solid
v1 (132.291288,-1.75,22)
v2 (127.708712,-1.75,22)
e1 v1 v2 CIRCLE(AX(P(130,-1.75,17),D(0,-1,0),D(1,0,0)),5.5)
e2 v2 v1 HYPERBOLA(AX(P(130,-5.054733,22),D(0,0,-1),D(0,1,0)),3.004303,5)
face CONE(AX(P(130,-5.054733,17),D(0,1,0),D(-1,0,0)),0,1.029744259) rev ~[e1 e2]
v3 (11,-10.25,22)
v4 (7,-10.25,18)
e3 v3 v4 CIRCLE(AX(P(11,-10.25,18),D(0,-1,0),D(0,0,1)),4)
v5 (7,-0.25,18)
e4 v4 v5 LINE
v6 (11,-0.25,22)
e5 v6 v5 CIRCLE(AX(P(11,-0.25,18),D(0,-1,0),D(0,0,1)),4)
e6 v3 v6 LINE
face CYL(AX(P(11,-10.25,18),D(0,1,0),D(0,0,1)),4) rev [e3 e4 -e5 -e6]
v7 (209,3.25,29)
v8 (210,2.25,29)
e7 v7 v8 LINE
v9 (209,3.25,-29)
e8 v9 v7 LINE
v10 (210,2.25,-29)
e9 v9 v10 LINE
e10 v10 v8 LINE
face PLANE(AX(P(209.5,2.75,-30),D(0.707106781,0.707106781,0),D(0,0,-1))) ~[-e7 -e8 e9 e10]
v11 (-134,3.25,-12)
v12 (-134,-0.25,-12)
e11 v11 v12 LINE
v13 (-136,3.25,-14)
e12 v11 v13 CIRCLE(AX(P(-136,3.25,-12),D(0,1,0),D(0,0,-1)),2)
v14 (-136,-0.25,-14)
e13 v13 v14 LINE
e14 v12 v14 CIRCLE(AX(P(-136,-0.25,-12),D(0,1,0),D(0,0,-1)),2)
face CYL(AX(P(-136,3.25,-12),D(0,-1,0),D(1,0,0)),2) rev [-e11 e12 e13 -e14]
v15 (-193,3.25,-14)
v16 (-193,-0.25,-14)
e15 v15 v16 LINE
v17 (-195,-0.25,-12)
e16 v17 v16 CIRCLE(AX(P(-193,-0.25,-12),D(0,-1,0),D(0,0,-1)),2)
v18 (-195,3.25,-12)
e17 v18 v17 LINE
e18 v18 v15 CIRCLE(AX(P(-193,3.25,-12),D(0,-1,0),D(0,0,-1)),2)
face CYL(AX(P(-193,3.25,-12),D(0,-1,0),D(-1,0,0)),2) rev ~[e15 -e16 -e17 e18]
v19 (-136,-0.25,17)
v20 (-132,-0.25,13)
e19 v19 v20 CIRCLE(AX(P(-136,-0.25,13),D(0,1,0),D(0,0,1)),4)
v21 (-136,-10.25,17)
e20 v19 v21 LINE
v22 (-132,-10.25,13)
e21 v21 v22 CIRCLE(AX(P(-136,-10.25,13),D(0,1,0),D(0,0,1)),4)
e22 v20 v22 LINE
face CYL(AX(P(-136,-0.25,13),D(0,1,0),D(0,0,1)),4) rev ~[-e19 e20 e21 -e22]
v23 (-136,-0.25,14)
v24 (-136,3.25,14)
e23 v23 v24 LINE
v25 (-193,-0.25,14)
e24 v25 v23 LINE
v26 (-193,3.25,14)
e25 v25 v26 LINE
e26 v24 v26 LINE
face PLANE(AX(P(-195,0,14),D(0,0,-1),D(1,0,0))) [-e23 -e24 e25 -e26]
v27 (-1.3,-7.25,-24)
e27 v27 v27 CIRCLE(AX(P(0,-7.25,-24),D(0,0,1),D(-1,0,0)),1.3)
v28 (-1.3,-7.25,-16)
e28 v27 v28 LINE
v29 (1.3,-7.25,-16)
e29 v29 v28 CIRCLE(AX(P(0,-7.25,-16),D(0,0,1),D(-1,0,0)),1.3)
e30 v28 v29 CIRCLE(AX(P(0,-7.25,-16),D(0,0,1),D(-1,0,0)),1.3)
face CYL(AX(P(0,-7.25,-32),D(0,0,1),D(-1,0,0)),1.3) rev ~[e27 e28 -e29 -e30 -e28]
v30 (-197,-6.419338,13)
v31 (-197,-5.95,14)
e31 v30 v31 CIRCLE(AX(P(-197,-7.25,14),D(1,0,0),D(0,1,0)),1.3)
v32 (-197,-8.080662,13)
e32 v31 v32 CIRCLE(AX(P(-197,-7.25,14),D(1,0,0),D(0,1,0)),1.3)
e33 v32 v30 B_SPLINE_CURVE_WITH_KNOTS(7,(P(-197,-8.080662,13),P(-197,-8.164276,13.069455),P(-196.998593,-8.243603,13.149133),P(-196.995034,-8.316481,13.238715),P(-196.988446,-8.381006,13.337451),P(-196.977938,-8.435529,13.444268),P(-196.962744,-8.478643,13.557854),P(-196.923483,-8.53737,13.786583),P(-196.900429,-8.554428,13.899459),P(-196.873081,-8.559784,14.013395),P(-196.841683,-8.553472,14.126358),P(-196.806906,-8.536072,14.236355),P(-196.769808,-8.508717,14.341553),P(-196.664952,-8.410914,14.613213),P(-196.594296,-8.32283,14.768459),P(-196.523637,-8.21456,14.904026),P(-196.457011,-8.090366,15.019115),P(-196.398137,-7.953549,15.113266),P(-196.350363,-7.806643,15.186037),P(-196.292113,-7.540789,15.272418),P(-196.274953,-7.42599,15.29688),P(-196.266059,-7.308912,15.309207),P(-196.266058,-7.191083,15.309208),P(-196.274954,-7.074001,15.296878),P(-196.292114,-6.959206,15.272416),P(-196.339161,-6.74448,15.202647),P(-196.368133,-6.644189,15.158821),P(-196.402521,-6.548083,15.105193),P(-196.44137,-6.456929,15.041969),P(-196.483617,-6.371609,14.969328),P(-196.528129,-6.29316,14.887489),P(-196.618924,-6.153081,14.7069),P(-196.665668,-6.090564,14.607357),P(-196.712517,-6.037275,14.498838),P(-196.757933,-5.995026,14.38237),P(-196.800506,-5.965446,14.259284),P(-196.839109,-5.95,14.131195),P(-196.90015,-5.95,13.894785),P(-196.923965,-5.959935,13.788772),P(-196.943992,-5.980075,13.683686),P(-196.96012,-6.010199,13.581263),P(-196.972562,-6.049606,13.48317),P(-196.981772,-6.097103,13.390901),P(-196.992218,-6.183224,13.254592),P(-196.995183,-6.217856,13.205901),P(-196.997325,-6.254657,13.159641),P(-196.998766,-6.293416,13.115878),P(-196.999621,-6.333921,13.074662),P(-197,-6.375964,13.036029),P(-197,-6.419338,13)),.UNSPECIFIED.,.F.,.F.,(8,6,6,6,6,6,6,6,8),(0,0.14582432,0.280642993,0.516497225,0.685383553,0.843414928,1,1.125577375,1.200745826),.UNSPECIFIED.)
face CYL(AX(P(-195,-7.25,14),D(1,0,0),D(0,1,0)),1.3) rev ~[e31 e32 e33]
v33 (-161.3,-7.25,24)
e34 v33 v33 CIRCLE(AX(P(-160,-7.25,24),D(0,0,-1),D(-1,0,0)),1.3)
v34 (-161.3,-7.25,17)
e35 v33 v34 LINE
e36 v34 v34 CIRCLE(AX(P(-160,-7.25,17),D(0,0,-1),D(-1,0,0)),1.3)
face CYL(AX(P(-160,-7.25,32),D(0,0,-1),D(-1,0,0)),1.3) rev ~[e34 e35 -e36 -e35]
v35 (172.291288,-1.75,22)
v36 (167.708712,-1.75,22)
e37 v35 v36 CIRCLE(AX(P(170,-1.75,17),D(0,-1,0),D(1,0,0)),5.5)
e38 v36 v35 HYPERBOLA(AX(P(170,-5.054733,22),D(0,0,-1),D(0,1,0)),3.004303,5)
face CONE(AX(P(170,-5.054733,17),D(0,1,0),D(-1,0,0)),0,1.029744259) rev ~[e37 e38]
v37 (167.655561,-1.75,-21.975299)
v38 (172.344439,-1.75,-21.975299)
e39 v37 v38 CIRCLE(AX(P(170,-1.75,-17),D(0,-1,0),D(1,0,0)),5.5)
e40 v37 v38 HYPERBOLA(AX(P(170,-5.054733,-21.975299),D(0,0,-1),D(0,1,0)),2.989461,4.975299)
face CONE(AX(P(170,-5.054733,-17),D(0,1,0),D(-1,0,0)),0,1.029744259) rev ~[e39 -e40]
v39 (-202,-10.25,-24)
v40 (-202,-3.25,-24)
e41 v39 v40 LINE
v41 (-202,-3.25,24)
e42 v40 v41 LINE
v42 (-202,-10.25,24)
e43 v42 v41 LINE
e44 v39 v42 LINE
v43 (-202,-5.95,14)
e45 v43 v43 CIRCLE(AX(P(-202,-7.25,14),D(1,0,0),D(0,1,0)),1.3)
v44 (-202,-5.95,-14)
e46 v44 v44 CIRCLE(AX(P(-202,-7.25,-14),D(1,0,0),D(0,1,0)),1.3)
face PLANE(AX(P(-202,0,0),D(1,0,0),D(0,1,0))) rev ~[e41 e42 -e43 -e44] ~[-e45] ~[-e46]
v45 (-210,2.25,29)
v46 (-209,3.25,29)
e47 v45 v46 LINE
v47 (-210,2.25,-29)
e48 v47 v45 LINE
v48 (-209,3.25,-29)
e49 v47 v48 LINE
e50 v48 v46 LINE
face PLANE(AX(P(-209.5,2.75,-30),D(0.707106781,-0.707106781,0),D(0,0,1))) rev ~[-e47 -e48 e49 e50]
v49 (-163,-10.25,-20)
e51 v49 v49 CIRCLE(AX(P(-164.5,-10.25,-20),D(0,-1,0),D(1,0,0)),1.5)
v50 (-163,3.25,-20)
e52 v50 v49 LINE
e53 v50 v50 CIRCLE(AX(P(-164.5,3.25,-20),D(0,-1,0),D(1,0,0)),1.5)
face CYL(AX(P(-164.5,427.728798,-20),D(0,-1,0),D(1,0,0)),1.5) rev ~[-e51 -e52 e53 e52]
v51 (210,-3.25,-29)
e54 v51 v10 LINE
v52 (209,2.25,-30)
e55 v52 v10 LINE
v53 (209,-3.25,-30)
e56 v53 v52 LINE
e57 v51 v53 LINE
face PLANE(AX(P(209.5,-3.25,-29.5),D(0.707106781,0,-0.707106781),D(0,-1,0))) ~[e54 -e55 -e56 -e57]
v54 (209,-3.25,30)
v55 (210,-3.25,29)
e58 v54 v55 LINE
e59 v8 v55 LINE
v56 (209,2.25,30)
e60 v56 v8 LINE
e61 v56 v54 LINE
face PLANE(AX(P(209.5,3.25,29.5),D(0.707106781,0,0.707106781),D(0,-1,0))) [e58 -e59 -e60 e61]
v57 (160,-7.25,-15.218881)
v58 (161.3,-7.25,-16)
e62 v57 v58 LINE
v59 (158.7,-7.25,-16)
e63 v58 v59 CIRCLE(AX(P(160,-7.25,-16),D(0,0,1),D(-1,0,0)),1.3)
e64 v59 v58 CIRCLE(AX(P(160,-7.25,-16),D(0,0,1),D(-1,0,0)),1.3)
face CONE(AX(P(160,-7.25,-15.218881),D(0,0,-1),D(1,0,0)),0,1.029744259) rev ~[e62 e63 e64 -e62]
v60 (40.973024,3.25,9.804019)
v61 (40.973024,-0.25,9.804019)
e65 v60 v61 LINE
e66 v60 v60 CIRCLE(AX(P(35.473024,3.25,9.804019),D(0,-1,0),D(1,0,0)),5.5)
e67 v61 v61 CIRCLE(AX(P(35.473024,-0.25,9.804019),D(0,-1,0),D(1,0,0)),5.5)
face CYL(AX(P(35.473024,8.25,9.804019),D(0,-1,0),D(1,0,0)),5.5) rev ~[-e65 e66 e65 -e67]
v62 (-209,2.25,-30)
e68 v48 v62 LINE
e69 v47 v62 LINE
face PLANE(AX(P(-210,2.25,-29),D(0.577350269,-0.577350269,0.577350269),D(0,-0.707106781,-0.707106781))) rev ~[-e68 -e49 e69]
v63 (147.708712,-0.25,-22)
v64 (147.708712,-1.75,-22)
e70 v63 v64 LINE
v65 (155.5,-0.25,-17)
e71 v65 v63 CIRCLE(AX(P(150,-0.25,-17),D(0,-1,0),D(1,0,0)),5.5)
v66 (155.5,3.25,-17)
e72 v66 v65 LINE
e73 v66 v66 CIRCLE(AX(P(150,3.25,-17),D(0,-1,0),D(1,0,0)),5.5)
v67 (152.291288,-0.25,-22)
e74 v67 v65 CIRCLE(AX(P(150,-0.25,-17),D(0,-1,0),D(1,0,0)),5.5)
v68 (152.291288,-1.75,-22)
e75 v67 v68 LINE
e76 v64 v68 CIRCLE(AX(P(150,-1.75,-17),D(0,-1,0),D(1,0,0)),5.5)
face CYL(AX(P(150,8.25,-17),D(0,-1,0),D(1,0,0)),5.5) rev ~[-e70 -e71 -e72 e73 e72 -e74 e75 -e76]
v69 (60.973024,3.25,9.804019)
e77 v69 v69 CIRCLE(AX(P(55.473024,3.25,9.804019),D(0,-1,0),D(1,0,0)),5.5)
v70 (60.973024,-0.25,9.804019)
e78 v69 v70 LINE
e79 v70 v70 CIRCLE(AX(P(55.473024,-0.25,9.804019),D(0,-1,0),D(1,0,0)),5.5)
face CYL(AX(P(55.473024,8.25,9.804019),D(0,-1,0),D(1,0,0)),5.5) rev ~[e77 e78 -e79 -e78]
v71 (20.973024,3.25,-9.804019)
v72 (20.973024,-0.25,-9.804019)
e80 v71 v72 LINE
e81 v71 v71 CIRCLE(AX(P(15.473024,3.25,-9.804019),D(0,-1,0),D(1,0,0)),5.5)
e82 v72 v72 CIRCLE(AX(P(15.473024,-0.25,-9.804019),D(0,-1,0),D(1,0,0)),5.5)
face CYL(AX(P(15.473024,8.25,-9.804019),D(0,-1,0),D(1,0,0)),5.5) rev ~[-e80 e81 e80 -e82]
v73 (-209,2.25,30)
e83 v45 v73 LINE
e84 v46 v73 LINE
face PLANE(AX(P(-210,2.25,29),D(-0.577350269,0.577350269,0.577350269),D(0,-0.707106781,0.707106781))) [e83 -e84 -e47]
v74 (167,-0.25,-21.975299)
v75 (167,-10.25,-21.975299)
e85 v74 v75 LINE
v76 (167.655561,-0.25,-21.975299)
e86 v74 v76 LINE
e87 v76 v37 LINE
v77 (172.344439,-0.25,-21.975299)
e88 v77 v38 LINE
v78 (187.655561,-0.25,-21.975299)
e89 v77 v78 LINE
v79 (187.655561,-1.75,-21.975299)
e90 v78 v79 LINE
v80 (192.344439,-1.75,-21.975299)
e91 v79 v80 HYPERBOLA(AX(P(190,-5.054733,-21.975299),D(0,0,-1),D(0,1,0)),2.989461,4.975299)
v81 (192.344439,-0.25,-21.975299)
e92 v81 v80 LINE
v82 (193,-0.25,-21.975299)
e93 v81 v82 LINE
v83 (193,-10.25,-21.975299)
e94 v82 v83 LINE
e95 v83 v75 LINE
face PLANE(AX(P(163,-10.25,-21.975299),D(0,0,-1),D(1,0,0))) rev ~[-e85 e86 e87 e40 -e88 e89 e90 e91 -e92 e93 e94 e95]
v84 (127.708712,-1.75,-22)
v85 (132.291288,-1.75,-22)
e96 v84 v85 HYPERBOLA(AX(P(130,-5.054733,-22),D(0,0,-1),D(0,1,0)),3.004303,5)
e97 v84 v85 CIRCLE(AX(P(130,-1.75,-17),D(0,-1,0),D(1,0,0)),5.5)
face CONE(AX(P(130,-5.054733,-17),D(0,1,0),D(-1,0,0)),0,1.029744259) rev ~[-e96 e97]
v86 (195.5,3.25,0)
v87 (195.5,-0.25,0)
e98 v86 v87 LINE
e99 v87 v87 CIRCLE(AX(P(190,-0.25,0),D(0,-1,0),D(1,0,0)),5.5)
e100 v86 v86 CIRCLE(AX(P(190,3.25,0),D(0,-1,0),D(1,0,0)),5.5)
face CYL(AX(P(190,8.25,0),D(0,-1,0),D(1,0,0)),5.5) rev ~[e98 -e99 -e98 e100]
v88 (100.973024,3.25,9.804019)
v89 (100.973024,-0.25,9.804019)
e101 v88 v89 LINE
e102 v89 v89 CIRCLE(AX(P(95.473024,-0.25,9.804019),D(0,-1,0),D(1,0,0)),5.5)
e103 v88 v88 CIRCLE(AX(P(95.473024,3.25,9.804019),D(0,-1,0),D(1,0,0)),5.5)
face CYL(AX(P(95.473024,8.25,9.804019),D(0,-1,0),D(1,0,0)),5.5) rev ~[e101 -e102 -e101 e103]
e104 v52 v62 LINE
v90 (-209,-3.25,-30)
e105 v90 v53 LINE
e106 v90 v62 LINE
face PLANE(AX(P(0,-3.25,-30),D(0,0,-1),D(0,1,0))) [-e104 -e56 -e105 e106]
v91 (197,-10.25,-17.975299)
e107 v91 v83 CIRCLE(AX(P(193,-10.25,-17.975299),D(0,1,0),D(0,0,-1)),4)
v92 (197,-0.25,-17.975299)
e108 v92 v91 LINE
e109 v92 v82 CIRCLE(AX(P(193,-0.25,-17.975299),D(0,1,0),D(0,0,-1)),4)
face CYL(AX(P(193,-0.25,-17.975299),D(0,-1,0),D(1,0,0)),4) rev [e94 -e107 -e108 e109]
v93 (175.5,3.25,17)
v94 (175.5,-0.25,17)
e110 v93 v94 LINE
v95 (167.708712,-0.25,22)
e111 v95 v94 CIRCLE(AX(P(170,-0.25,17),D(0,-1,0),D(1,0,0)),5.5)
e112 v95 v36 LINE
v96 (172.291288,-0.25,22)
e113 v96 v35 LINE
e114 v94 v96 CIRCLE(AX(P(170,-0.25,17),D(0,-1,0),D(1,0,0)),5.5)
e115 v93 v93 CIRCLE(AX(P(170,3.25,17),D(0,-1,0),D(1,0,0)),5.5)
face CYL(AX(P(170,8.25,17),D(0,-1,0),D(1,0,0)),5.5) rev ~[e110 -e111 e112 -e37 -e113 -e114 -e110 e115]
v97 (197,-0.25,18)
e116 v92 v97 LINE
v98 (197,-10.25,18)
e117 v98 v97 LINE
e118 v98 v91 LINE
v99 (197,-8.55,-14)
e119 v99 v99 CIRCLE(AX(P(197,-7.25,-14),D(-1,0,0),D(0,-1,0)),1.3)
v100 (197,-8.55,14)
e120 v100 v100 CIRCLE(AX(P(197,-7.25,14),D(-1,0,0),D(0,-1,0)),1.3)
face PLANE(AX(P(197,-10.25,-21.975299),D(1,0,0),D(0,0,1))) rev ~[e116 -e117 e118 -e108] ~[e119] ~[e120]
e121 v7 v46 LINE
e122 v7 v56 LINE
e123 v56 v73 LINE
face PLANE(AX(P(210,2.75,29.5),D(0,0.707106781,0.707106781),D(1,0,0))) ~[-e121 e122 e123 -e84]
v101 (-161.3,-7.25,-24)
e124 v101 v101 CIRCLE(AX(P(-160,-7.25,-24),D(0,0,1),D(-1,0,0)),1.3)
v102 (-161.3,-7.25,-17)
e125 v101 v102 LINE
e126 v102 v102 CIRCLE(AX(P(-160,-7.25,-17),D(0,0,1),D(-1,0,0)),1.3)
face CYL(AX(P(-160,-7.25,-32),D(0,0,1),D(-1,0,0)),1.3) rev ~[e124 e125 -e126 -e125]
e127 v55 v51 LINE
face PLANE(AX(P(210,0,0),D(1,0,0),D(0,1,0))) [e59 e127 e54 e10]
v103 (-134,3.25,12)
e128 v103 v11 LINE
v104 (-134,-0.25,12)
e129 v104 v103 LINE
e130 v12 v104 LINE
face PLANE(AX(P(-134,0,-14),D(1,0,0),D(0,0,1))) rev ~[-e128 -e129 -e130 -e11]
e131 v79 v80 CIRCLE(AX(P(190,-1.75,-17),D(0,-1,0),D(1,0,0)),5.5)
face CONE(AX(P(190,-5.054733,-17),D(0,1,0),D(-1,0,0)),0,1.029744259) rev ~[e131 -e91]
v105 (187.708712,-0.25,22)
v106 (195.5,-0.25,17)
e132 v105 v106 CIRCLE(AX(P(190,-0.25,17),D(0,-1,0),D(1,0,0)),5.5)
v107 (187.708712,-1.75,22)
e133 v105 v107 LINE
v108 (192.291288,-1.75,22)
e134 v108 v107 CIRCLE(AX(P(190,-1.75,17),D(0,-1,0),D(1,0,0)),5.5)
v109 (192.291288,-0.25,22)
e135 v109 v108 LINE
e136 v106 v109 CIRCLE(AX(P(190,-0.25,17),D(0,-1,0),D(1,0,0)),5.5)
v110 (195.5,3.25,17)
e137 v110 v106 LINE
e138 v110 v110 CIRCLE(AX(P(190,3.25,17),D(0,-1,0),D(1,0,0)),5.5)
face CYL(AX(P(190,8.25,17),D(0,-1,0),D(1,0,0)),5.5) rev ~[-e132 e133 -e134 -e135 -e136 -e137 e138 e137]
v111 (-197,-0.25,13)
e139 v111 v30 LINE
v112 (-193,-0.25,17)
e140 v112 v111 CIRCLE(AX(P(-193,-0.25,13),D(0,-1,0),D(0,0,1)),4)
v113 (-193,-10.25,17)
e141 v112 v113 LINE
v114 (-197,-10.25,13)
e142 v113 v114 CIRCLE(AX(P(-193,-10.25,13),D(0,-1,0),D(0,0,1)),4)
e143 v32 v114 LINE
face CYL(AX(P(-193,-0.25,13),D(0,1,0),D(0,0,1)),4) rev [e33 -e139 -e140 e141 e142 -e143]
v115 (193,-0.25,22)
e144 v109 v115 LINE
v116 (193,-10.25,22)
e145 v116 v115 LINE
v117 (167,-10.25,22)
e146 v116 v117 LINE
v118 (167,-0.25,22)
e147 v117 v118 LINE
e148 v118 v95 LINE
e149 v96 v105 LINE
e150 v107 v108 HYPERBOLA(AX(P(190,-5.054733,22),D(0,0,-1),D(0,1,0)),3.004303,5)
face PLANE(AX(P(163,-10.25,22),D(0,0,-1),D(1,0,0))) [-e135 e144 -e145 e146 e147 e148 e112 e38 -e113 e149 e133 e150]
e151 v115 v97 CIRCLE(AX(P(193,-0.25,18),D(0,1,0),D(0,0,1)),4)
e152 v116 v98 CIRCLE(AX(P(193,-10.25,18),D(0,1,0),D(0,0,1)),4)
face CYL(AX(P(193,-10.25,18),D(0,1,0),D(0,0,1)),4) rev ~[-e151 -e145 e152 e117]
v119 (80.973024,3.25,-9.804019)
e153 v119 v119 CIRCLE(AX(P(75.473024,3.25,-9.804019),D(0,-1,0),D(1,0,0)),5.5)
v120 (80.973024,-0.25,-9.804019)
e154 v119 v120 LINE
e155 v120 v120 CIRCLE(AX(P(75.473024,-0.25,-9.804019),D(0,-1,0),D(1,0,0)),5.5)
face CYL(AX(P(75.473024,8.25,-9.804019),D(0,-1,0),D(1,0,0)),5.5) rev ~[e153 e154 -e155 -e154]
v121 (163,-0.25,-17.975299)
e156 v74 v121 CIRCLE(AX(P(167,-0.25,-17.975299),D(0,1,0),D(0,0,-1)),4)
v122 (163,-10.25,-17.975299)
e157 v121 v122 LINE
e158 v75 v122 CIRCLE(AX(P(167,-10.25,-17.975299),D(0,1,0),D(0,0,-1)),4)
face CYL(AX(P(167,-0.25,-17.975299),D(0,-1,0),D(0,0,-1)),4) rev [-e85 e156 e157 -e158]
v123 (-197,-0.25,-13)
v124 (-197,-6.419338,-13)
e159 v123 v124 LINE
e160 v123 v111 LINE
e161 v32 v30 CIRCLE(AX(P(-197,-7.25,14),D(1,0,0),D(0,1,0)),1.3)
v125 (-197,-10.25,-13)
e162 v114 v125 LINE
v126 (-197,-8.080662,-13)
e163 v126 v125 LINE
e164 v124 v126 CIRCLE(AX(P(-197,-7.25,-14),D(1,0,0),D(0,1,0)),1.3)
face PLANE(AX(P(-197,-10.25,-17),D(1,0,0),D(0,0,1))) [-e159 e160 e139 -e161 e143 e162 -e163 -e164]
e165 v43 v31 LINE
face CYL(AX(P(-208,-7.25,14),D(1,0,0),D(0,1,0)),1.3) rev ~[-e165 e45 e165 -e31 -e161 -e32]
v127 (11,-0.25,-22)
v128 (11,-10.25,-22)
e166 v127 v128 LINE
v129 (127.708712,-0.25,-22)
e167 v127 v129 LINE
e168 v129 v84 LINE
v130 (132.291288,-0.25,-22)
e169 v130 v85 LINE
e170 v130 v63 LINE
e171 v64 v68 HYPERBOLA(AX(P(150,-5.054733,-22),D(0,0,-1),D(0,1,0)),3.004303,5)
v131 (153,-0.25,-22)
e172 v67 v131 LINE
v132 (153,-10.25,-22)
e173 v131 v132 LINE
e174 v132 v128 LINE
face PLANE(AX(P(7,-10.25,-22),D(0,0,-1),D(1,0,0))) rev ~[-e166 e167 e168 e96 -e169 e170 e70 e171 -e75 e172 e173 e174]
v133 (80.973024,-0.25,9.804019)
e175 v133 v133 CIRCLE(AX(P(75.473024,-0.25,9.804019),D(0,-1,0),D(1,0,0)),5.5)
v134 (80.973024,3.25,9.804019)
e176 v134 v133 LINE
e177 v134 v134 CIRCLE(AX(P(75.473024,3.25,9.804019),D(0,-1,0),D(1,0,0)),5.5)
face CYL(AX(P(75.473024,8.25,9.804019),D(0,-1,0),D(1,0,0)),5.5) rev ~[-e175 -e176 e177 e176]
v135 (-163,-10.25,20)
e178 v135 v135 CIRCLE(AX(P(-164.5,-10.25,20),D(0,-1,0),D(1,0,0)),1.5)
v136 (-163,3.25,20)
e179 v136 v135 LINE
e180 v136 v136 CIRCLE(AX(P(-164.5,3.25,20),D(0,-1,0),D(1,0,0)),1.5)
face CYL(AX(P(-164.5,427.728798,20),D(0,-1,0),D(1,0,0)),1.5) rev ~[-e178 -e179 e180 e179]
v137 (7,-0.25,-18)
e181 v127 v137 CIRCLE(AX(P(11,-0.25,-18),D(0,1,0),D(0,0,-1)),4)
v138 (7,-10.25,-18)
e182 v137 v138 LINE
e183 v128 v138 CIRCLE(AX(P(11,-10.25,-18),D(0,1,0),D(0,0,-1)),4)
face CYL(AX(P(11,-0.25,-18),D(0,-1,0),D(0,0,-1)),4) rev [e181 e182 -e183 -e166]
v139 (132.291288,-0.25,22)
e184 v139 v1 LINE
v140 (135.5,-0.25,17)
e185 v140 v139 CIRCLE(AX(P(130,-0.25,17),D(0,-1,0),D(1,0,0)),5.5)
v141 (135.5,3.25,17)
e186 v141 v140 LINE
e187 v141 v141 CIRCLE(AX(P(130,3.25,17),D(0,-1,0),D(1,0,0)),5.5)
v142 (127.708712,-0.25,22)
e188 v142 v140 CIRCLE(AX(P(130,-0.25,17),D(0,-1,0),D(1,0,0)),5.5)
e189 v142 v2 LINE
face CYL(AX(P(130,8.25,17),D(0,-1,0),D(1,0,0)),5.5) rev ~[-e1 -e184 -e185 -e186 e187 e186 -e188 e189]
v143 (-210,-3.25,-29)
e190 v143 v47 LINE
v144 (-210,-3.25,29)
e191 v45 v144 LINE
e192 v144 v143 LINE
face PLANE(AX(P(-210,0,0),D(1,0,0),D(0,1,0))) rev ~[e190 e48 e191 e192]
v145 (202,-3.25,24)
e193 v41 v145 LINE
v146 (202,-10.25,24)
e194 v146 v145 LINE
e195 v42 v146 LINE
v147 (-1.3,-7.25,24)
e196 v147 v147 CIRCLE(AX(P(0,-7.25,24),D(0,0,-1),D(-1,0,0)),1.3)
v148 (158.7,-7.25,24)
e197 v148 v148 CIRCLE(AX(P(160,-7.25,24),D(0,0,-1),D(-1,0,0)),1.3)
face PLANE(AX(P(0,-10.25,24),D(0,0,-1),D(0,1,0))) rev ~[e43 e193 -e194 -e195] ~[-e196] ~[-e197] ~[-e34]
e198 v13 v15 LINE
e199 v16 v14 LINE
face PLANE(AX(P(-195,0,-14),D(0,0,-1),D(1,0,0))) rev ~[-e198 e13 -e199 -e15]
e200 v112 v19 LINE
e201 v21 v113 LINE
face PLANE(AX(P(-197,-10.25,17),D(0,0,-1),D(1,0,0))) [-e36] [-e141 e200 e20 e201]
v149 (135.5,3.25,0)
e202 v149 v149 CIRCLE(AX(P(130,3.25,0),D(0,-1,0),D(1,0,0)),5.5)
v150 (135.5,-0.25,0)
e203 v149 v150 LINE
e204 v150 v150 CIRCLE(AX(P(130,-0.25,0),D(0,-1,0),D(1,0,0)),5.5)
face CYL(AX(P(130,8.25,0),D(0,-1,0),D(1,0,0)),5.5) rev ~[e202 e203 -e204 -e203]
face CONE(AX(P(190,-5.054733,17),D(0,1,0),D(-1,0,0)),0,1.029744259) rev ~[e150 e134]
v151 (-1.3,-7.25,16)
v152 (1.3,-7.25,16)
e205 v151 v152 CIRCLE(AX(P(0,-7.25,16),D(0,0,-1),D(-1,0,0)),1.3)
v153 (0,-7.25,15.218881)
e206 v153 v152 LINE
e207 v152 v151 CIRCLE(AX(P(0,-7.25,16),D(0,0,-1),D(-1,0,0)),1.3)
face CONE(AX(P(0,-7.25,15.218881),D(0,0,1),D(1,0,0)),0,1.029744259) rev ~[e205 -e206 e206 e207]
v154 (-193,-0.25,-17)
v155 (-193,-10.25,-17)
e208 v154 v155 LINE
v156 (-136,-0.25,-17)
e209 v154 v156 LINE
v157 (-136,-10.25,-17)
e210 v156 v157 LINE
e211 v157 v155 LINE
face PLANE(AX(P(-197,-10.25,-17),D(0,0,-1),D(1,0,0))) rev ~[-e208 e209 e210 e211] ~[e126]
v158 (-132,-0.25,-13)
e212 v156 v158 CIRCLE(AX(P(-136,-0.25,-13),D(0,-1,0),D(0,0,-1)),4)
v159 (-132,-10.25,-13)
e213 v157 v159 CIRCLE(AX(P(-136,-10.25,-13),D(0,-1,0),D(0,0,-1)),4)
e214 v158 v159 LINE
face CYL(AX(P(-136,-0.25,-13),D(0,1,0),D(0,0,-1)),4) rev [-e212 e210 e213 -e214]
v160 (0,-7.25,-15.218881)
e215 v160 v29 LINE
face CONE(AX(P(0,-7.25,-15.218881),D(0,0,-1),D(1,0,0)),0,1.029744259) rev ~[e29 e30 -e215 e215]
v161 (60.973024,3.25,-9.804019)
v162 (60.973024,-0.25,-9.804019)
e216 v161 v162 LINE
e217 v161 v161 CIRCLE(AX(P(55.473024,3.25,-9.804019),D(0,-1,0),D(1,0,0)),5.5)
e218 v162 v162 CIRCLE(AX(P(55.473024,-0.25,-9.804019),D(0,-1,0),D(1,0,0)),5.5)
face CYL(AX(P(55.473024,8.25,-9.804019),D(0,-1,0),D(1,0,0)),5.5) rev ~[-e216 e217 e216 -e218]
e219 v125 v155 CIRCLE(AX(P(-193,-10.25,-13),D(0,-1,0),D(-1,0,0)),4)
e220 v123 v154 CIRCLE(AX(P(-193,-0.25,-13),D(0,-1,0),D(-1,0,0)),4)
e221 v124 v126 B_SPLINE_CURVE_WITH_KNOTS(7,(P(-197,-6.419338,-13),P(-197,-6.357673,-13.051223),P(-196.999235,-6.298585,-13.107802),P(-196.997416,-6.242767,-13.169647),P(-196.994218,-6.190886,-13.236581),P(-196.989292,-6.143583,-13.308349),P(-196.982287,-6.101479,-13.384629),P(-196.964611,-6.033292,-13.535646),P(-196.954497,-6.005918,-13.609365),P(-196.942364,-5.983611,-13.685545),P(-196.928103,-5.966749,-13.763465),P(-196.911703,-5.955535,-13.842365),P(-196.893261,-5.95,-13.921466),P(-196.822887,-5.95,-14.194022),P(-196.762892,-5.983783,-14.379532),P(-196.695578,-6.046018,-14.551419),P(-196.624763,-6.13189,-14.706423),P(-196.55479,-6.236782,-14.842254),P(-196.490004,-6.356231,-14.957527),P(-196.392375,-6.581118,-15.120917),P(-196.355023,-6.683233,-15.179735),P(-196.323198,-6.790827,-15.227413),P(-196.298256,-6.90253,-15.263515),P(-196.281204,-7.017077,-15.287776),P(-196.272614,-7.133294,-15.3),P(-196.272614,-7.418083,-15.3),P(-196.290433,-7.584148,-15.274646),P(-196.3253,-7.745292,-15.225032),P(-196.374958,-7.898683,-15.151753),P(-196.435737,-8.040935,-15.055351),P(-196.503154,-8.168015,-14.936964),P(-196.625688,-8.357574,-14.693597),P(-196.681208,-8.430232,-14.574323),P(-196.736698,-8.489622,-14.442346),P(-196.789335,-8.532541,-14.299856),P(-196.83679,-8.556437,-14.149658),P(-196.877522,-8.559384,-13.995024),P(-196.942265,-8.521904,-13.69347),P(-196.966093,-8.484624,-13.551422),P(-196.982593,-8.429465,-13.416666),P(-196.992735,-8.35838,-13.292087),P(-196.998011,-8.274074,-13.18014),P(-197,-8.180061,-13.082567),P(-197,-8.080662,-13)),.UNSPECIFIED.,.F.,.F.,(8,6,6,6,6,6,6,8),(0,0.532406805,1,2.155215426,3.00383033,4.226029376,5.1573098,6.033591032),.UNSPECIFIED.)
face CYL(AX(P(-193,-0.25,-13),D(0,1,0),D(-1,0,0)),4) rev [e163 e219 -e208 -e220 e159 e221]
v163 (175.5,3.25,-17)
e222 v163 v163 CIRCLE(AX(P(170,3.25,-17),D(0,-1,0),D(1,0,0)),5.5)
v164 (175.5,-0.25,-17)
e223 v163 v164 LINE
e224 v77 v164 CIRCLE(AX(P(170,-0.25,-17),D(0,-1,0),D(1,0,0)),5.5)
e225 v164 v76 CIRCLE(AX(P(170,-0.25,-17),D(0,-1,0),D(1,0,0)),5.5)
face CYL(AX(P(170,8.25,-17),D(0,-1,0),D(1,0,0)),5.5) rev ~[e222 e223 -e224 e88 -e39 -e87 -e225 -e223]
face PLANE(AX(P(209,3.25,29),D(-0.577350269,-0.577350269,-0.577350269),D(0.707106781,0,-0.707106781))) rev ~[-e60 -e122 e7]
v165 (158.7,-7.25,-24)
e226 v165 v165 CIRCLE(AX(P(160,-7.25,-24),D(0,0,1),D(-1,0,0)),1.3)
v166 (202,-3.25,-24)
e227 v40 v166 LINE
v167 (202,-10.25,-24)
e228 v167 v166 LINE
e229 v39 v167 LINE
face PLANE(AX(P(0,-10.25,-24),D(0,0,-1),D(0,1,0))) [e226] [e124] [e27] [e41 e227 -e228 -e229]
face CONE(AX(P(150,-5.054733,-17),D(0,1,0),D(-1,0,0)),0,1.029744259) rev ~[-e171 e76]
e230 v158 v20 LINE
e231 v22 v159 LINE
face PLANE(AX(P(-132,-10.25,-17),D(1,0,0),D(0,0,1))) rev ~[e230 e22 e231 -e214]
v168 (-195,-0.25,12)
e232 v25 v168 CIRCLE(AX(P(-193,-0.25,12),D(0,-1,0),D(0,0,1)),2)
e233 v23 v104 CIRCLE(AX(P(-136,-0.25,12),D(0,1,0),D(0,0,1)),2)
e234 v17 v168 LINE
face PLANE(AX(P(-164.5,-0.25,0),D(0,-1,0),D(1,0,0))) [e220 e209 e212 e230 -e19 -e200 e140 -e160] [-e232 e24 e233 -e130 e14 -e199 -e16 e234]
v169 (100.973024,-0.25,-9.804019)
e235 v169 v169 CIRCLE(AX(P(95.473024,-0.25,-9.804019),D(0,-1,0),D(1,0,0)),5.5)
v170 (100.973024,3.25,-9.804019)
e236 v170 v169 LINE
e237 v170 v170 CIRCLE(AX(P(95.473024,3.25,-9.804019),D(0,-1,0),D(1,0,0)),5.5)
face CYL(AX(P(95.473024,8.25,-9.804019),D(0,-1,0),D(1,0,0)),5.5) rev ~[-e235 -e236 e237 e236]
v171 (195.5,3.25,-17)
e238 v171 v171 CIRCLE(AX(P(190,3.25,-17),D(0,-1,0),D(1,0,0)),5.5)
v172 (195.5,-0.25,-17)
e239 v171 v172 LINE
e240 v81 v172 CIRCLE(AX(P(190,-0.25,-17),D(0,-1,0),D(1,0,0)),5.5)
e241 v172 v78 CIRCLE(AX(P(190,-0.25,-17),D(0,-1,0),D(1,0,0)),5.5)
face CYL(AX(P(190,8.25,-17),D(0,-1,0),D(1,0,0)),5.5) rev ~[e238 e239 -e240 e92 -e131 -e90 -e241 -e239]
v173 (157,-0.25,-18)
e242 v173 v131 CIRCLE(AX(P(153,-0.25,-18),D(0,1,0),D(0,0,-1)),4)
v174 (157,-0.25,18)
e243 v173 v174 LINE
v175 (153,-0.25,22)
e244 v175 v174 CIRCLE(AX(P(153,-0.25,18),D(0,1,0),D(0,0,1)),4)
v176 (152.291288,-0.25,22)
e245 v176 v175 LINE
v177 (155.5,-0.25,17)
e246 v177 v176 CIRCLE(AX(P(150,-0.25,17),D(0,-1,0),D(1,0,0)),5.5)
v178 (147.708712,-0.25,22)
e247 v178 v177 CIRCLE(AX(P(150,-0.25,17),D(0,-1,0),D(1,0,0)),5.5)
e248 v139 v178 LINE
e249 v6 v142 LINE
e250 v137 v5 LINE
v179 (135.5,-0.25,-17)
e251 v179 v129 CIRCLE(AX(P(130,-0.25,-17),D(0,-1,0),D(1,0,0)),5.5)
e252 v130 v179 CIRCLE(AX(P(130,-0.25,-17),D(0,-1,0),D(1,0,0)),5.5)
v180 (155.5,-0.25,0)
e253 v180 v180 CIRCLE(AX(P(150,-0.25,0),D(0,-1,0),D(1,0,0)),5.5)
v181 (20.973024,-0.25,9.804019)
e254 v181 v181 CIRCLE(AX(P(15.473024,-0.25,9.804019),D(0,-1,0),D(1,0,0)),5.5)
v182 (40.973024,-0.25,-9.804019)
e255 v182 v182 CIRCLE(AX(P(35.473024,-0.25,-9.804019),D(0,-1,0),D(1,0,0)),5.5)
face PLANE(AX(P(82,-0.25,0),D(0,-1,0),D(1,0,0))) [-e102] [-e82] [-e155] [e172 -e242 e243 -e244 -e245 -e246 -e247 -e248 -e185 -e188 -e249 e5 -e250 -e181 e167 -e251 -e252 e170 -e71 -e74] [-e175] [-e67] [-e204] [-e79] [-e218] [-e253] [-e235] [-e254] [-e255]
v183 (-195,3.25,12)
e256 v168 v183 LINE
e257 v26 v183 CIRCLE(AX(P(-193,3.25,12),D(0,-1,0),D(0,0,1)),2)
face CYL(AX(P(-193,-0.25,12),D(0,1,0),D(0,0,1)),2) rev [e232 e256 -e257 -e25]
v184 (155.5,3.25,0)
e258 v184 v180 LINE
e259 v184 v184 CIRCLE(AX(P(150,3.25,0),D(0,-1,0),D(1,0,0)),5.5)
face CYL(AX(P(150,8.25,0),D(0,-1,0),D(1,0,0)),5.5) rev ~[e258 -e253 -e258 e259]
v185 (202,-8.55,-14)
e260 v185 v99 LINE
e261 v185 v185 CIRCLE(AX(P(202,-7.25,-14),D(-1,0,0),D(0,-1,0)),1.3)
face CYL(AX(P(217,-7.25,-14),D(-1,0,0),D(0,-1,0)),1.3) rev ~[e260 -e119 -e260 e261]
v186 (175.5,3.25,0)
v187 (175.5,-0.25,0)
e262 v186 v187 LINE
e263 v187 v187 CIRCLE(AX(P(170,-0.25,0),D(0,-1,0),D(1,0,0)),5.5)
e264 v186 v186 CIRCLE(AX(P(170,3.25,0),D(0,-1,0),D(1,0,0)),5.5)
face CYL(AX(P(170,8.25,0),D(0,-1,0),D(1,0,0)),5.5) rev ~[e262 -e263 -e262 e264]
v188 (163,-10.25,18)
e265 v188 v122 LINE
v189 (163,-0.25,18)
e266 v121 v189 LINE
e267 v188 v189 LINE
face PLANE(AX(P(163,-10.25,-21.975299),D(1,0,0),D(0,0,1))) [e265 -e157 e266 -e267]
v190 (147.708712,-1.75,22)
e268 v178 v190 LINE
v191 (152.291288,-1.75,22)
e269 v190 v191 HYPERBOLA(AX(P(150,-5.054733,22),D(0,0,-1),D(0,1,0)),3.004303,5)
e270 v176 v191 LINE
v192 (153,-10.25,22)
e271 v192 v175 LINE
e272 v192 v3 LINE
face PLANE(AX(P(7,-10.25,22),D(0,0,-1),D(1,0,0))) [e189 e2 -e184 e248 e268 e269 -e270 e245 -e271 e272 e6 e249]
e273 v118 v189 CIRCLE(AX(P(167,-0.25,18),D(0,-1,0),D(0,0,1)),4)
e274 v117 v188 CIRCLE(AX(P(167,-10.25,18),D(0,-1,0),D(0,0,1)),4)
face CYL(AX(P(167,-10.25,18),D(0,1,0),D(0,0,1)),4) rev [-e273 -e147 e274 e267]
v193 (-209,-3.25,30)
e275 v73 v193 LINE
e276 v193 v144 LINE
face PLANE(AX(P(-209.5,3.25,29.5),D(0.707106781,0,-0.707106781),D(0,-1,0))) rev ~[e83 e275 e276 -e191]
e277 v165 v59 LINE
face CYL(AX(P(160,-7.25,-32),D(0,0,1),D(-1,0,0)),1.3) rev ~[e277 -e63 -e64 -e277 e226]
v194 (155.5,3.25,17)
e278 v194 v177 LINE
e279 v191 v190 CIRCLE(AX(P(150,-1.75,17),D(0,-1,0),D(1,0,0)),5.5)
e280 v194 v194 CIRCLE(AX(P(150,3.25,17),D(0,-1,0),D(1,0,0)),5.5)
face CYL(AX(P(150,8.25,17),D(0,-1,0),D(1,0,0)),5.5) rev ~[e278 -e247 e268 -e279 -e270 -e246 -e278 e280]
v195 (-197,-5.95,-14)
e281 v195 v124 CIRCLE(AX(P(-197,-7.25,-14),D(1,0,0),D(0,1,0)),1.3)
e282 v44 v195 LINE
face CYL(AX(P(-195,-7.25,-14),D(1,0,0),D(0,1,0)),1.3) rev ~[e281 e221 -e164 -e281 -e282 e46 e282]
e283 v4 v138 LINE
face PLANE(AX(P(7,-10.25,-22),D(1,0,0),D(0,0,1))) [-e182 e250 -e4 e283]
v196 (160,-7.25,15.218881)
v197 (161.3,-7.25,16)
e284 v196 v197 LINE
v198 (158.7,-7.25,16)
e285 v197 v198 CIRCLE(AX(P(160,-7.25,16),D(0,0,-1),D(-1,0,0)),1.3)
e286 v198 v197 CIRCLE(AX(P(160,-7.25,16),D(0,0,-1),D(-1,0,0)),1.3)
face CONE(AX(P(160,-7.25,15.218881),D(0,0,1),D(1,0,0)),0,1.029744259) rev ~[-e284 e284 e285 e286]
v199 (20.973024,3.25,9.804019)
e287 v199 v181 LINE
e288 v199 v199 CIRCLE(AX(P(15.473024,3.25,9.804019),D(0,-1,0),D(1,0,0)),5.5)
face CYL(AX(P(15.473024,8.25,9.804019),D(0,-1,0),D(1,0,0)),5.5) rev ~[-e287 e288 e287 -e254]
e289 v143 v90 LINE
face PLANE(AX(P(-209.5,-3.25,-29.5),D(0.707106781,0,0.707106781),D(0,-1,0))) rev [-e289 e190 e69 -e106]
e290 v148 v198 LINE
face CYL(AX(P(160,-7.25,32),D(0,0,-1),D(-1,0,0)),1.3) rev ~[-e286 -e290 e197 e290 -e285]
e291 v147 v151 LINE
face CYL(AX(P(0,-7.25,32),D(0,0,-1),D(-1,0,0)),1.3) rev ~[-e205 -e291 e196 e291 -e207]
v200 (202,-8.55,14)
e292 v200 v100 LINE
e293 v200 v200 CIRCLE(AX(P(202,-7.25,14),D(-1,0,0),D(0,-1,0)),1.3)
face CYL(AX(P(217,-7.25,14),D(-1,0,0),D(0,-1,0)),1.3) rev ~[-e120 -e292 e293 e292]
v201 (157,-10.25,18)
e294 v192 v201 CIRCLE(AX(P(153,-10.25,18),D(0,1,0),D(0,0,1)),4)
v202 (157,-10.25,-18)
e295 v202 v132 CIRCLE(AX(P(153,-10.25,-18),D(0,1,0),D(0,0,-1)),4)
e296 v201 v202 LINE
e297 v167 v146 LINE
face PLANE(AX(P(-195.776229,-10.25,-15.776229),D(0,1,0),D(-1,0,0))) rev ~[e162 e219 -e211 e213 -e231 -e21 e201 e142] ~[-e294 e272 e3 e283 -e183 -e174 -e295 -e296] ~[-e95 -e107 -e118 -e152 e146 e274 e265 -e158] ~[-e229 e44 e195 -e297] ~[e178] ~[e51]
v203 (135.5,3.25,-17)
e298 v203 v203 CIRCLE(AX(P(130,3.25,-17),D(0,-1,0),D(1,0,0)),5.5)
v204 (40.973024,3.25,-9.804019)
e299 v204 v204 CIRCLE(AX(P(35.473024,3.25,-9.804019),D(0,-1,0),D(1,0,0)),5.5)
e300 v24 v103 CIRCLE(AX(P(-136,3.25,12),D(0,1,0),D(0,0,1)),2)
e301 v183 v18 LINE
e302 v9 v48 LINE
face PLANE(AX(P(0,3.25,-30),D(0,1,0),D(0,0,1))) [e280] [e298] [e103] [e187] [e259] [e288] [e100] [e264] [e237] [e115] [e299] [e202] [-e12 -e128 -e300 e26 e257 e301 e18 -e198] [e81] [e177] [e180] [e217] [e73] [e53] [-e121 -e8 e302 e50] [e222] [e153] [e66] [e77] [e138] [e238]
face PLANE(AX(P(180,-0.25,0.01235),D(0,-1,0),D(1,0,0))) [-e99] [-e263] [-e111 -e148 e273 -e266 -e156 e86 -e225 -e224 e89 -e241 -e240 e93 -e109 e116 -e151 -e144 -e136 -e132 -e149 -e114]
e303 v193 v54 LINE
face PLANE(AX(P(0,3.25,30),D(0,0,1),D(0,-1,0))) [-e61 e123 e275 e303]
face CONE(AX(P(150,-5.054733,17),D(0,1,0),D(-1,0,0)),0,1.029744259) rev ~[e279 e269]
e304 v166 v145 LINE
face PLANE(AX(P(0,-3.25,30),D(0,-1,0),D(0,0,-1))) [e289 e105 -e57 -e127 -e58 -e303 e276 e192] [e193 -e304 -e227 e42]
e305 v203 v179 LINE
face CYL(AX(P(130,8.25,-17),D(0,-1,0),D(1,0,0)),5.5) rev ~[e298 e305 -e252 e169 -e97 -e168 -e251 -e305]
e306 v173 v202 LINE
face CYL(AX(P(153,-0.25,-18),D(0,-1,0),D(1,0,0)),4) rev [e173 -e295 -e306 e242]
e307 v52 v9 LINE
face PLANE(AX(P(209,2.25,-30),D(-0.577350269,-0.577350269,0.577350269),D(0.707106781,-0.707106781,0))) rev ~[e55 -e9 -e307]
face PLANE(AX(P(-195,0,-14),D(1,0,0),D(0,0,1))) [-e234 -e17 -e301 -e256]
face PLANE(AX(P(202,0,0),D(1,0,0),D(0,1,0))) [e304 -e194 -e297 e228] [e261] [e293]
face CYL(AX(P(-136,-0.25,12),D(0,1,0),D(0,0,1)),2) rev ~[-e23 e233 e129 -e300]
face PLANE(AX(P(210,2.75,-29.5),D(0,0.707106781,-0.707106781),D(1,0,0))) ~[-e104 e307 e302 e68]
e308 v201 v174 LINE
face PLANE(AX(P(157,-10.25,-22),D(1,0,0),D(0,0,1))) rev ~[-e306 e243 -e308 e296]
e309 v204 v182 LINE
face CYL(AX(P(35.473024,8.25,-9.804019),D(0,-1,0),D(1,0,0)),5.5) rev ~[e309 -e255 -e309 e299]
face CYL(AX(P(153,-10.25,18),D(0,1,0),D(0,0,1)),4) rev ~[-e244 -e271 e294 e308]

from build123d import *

# Parameters (mm, degrees)
F1_DEPTH      = 210
F0_W          = 7
F0_H          = 48
F2_DEPTH      = 202
F5_D          = 2.6
F5_DEPTH      = 8
F5_TIP        = 0.7811188047
F6_D          = 2.6
F6_DEPTH      = 8
F6_TIP        = 0.7811188047
F9_D          = 2.6
F9_DEPTH      = 6
F9_TIP        = 0.7811188047
F10_D         = 2.6
F10_DEPTH     = 15
F10_TIP       = 0.7811188047
F11_W         = 61
F11_H         = 28
F12_DEPTH     = 12.5
F15_D         = 3
F17_D         = 11
F17_DEPTH     = 5
F17_TIP       = 3.3047334047
F18_D         = 11
F18_DEPTH     = 5
F18_TIP       = 3.3047334047
F19_SIZE      = 1
F20_W         = 65
F20_H         = 34
F20_W_2       = 61
F20_H_2       = 28
F21_DEPTH     = 10
F22_R         = 2
F23_T1_DEPTH  = 10
F23_T6_DEPTH  = 10
F23_S7_R      = 1.3
F23_T8_DEPTH  = 7
F23_T12_DEPTH = 10
F23_S13_R     = 1.3
F23_T14_DEPTH = 7
F20_W_3       = 150
F20_H_3       = 44
F24_DEPTH     = 10
F25_R         = 4
F20_W_4       = 34
F20_H_4       = 43.9752993435
F26_DEPTH     = 10
F27_R         = 4


# Not quite as in the source:
# - a fillet or chamfer that OpenCascade refuses, or shapes differently, is made with other operations: its cross-section is extruded or revolved along the edge and cut away or added
# - a feature names something its author has since deleted; it is built from what else it names


with BuildPart() as f1:
    # F0 (on Right) → F1 (new body, symmetric)
    with BuildSketch(Plane.YZ):
        Polygon((3.25, 30), (-3.25, 30), (-3.25, 24), (-3.25, -24), (-3.25, -30), (3.25, -30), align=None)
    extrude(amount=F1_DEPTH, both=True)

    # F0 (on Right) → F2 (join, symmetric)
    with BuildSketch(Plane.YZ):
        Polygon((3.25, 30), (-3.25, 30), (-3.25, 24), (-3.25, -24), (-3.25, -30), (3.25, -30), align=None)
        with Locations((-6.75, 0)):
            Rectangle(F0_W, F0_H)
    extrude(amount=F2_DEPTH, both=True)

    # F5
    with Locations(Plane.XY.offset(24)):
        with Locations((0, -7.25), (-160, -7.25), (160, -7.25)):
            Hole(F5_D / 2, depth=F5_DEPTH)
            with Locations((0, 0, -(F5_DEPTH + F5_TIP / 2))):  # 118° drill point
                Cone(0, F5_D / 2, F5_TIP, mode=Mode.SUBTRACT)

    # F6
    with Locations(Plane(origin=(0, 0, -24), x_dir=(1, 0, 0), z_dir=(0, 0, -1))):
        with Locations((-160, 7.25), (0, 7.25), (160, 7.25)):
            Hole(F6_D / 2, depth=F6_DEPTH)
            with Locations((0, 0, -(F6_DEPTH + F6_TIP / 2))):  # 118° drill point
                Cone(0, F6_D / 2, F6_TIP, mode=Mode.SUBTRACT)

    # F9
    with Locations(Plane(origin=(-202, 0, 0), x_dir=(0, -1, 0), z_dir=(-1, 0, 0))):
        with Locations((7.25, -14), (7.25, 14)):
            Hole(F9_D / 2, depth=F9_DEPTH)
            with Locations((0, 0, -(F9_DEPTH + F9_TIP / 2))):  # 118° drill point
                Cone(0, F9_D / 2, F9_TIP, mode=Mode.SUBTRACT)

    # F10
    with Locations(Plane.YZ.offset(202)):
        with Locations((-7.25, -14), (-7.25, 14)):
            Hole(F10_D / 2, depth=F10_DEPTH)
            with Locations((0, 0, -(F10_DEPTH + F10_TIP / 2))):  # 118° drill point
                Cone(0, F10_D / 2, F10_TIP, mode=Mode.SUBTRACT)


with BuildPart() as f12:
    # F11 (on Front) → F12 (new body, symmetric)
    with BuildSketch(Plane.XZ):
        with Locations((-164.5, 0)):
            Rectangle(F11_W, F11_H)
    extrude(amount=F12_DEPTH, both=True)


with BuildPart() as f1_1:
    add(f1.part)

    # F13: cut F12
    add(f12.part, mode=Mode.SUBTRACT)

    # F15 (through all)
    with Locations(Plane(origin=(0, 3.25, 0), x_dir=(-1, 0, 0), z_dir=(0, 1, 0))):
        with Locations((164.5, 20), (164.5, -20)):
            Hole(F15_D / 2)

    # F17
    with Locations(Plane(origin=(0, 3.25, 0), x_dir=(-1, 0, 0), z_dir=(0, 1, 0))):
        with Locations((-190, 17), (-170, 17), (-170, 0), (-190, 0), (-75.4730241728, 9.8040188106), (-55.4730241728, 9.8040188106), (-75.4730241728, -9.8040188106), (-55.4730241728, -9.8040188106), (-170, -17), (-190, -17), (-35.4730241728, 9.8040188106), (-15.4730241728, 9.8040188106), (-15.4730241728, -9.8040188106), (-35.4730241728, -9.8040188106), (-150, 17), (-130, 17), (-130, 0), (-150, 0), (-150, -17), (-130, -17)):
            Hole(F17_D / 2, depth=F17_DEPTH)
            with Locations((0, 0, -(F17_DEPTH + F17_TIP / 2))):  # 118° drill point
                Cone(0, F17_D / 2, F17_TIP, mode=Mode.SUBTRACT)

    # F18
    with Locations(Plane(origin=(0, 3.25, 0), x_dir=(-1, 0, 0), z_dir=(0, 1, 0))):
        with Locations((-95.4730241728, -9.8040188106), (-95.4730241728, 9.8040188106)):
            Hole(F18_D / 2, depth=F18_DEPTH)
            with Locations((0, 0, -(F18_DEPTH + F18_TIP / 2))):  # 118° drill point
                Cone(0, F18_D / 2, F18_TIP, mode=Mode.SUBTRACT)

    # F19
    f19_edges = [f1_1.edges().sort_by_distance(p)[0] for p in [
        (210, 0, 30),
        (0, 3.25, 30),
        (210, 3.25, 0),
        (0, 3.25, -30),
        (-210, 3.25, 0),
        (-210, 0, 30),
        (-210, 0, -30),
        (210, 0, -30),
    ]]
    chamfer(f19_edges, length=F19_SIZE)

    # F20 (on face) → F21 (cut, symmetric)
    with BuildSketch(Plane.XZ.offset(10.25)):
        with Locations((-164.5, 0)):
            Rectangle(F20_W, F20_H)
        with Locations((-164.5, 0)):
            Rectangle(F20_W_2, F20_H_2, mode=Mode.SUBTRACT)
    extrude(amount=F21_DEPTH, both=True, mode=Mode.SUBTRACT)

    # F22
    f22_edges = [f1_1.edges().sort_by_distance(p)[0] for p in [
        (-195, 1.5, 14),
        (-134, 1.5, 14),
        (-195, 1.5, -14),
        (-134, 1.5, -14),
    ]]
    fillet(f22_edges, radius=F22_R)

    # F23: fillet of radius 4 on 4 edges, made by hand

    # F23_s2 → F23_t1 (join)
    with BuildSketch(Plane.XZ.offset(0.25)):
        with BuildLine():
            ThreePointArc((-136, 17), (-133.1715728753, 15.8284271247), (-132, 13))
            Line((-132, 13), (-132, 17))
            Line((-132, 17), (-136, 17))
        make_face()
        with BuildLine():
            ThreePointArc((-136, -17), (-133.1715728753, -15.8284271247), (-132, -13))
            Line((-132, -13), (-132, -17))
            Line((-132, -17), (-136, -17))
        make_face()
    extrude(amount=F23_T1_DEPTH)


with BuildPart() as f23_tool4:
    # F23_s5 → F23_t6 (new body)
    with BuildSketch(Plane.XZ.offset(0.25)):
        with BuildLine():
            ThreePointArc((-193, 17), (-195.8284271247, 15.8284271247), (-197, 13))
            Line((-197, 13), (-197, 17))
            Line((-197, 17), (-193, 17))
        make_face()
    extrude(amount=F23_T6_DEPTH)

    # F23_s7 → F23_t8 (cut, symmetric)
    with BuildSketch(Plane.YZ.offset(-195)):
        with Locations((-7.25, 14)):
            Circle(F23_S7_R)
    extrude(amount=F23_T8_DEPTH, both=True, mode=Mode.SUBTRACT)


with BuildPart() as f1_2:
    add(f1_1.part)

    # F23_t3: union F23_tool4
    add(f23_tool4.part)


with BuildPart() as f23_tool10:
    # F23_s11 → F23_t12 (new body)
    with BuildSketch(Plane.XZ.offset(0.25)):
        with BuildLine():
            ThreePointArc((-197, -13), (-195.8284271247, -15.8284271247), (-193, -17))
            Line((-193, -17), (-197, -17))
            Line((-197, -17), (-197, -13))
        make_face()
    extrude(amount=F23_T12_DEPTH)

    # F23_s13 → F23_t14 (cut, symmetric)
    with BuildSketch(Plane.YZ.offset(-195)):
        with Locations((-7.25, -14)):
            Circle(F23_S13_R)
    extrude(amount=F23_T14_DEPTH, both=True, mode=Mode.SUBTRACT)


with BuildPart() as f1_3:
    add(f1_2.part)

    # F23_t9: union F23_tool10
    add(f23_tool10.part)

    # F20 (on face) → F24 (cut, symmetric)
    with BuildSketch(Plane.XZ.offset(10.25)):
        with Locations((82, 0)):
            Rectangle(F20_W_3, F20_H_3)
    extrude(amount=F24_DEPTH, both=True, mode=Mode.SUBTRACT)

    # F25
    f25_edges = [f1_3.edges().sort_by_distance(p)[0] for p in [
        (157, -5.25, 22),
        (157, -5.25, -22),
        (7, -5.25, -22),
        (7, -5.25, 22),
    ]]
    fillet(f25_edges, radius=F25_R)

    # F20 (on face) → F26 (cut, symmetric)
    with BuildSketch(Plane.XZ.offset(10.25)):
        with Locations((180, 0.0123503283)):
            Rectangle(F20_W_4, F20_H_4)
    extrude(amount=F26_DEPTH, both=True, mode=Mode.SUBTRACT)

    # F27
    f27_edges = [f1_3.edges().sort_by_distance(p)[0] for p in [
        (163, -5.25, -21.975299),
        (163, -5.25, 22),
        (197, -5.25, 22),
        (197, -5.25, -21.975299),
    ]]
    fillet(f27_edges, radius=F27_R)


solid = f1_3.part
